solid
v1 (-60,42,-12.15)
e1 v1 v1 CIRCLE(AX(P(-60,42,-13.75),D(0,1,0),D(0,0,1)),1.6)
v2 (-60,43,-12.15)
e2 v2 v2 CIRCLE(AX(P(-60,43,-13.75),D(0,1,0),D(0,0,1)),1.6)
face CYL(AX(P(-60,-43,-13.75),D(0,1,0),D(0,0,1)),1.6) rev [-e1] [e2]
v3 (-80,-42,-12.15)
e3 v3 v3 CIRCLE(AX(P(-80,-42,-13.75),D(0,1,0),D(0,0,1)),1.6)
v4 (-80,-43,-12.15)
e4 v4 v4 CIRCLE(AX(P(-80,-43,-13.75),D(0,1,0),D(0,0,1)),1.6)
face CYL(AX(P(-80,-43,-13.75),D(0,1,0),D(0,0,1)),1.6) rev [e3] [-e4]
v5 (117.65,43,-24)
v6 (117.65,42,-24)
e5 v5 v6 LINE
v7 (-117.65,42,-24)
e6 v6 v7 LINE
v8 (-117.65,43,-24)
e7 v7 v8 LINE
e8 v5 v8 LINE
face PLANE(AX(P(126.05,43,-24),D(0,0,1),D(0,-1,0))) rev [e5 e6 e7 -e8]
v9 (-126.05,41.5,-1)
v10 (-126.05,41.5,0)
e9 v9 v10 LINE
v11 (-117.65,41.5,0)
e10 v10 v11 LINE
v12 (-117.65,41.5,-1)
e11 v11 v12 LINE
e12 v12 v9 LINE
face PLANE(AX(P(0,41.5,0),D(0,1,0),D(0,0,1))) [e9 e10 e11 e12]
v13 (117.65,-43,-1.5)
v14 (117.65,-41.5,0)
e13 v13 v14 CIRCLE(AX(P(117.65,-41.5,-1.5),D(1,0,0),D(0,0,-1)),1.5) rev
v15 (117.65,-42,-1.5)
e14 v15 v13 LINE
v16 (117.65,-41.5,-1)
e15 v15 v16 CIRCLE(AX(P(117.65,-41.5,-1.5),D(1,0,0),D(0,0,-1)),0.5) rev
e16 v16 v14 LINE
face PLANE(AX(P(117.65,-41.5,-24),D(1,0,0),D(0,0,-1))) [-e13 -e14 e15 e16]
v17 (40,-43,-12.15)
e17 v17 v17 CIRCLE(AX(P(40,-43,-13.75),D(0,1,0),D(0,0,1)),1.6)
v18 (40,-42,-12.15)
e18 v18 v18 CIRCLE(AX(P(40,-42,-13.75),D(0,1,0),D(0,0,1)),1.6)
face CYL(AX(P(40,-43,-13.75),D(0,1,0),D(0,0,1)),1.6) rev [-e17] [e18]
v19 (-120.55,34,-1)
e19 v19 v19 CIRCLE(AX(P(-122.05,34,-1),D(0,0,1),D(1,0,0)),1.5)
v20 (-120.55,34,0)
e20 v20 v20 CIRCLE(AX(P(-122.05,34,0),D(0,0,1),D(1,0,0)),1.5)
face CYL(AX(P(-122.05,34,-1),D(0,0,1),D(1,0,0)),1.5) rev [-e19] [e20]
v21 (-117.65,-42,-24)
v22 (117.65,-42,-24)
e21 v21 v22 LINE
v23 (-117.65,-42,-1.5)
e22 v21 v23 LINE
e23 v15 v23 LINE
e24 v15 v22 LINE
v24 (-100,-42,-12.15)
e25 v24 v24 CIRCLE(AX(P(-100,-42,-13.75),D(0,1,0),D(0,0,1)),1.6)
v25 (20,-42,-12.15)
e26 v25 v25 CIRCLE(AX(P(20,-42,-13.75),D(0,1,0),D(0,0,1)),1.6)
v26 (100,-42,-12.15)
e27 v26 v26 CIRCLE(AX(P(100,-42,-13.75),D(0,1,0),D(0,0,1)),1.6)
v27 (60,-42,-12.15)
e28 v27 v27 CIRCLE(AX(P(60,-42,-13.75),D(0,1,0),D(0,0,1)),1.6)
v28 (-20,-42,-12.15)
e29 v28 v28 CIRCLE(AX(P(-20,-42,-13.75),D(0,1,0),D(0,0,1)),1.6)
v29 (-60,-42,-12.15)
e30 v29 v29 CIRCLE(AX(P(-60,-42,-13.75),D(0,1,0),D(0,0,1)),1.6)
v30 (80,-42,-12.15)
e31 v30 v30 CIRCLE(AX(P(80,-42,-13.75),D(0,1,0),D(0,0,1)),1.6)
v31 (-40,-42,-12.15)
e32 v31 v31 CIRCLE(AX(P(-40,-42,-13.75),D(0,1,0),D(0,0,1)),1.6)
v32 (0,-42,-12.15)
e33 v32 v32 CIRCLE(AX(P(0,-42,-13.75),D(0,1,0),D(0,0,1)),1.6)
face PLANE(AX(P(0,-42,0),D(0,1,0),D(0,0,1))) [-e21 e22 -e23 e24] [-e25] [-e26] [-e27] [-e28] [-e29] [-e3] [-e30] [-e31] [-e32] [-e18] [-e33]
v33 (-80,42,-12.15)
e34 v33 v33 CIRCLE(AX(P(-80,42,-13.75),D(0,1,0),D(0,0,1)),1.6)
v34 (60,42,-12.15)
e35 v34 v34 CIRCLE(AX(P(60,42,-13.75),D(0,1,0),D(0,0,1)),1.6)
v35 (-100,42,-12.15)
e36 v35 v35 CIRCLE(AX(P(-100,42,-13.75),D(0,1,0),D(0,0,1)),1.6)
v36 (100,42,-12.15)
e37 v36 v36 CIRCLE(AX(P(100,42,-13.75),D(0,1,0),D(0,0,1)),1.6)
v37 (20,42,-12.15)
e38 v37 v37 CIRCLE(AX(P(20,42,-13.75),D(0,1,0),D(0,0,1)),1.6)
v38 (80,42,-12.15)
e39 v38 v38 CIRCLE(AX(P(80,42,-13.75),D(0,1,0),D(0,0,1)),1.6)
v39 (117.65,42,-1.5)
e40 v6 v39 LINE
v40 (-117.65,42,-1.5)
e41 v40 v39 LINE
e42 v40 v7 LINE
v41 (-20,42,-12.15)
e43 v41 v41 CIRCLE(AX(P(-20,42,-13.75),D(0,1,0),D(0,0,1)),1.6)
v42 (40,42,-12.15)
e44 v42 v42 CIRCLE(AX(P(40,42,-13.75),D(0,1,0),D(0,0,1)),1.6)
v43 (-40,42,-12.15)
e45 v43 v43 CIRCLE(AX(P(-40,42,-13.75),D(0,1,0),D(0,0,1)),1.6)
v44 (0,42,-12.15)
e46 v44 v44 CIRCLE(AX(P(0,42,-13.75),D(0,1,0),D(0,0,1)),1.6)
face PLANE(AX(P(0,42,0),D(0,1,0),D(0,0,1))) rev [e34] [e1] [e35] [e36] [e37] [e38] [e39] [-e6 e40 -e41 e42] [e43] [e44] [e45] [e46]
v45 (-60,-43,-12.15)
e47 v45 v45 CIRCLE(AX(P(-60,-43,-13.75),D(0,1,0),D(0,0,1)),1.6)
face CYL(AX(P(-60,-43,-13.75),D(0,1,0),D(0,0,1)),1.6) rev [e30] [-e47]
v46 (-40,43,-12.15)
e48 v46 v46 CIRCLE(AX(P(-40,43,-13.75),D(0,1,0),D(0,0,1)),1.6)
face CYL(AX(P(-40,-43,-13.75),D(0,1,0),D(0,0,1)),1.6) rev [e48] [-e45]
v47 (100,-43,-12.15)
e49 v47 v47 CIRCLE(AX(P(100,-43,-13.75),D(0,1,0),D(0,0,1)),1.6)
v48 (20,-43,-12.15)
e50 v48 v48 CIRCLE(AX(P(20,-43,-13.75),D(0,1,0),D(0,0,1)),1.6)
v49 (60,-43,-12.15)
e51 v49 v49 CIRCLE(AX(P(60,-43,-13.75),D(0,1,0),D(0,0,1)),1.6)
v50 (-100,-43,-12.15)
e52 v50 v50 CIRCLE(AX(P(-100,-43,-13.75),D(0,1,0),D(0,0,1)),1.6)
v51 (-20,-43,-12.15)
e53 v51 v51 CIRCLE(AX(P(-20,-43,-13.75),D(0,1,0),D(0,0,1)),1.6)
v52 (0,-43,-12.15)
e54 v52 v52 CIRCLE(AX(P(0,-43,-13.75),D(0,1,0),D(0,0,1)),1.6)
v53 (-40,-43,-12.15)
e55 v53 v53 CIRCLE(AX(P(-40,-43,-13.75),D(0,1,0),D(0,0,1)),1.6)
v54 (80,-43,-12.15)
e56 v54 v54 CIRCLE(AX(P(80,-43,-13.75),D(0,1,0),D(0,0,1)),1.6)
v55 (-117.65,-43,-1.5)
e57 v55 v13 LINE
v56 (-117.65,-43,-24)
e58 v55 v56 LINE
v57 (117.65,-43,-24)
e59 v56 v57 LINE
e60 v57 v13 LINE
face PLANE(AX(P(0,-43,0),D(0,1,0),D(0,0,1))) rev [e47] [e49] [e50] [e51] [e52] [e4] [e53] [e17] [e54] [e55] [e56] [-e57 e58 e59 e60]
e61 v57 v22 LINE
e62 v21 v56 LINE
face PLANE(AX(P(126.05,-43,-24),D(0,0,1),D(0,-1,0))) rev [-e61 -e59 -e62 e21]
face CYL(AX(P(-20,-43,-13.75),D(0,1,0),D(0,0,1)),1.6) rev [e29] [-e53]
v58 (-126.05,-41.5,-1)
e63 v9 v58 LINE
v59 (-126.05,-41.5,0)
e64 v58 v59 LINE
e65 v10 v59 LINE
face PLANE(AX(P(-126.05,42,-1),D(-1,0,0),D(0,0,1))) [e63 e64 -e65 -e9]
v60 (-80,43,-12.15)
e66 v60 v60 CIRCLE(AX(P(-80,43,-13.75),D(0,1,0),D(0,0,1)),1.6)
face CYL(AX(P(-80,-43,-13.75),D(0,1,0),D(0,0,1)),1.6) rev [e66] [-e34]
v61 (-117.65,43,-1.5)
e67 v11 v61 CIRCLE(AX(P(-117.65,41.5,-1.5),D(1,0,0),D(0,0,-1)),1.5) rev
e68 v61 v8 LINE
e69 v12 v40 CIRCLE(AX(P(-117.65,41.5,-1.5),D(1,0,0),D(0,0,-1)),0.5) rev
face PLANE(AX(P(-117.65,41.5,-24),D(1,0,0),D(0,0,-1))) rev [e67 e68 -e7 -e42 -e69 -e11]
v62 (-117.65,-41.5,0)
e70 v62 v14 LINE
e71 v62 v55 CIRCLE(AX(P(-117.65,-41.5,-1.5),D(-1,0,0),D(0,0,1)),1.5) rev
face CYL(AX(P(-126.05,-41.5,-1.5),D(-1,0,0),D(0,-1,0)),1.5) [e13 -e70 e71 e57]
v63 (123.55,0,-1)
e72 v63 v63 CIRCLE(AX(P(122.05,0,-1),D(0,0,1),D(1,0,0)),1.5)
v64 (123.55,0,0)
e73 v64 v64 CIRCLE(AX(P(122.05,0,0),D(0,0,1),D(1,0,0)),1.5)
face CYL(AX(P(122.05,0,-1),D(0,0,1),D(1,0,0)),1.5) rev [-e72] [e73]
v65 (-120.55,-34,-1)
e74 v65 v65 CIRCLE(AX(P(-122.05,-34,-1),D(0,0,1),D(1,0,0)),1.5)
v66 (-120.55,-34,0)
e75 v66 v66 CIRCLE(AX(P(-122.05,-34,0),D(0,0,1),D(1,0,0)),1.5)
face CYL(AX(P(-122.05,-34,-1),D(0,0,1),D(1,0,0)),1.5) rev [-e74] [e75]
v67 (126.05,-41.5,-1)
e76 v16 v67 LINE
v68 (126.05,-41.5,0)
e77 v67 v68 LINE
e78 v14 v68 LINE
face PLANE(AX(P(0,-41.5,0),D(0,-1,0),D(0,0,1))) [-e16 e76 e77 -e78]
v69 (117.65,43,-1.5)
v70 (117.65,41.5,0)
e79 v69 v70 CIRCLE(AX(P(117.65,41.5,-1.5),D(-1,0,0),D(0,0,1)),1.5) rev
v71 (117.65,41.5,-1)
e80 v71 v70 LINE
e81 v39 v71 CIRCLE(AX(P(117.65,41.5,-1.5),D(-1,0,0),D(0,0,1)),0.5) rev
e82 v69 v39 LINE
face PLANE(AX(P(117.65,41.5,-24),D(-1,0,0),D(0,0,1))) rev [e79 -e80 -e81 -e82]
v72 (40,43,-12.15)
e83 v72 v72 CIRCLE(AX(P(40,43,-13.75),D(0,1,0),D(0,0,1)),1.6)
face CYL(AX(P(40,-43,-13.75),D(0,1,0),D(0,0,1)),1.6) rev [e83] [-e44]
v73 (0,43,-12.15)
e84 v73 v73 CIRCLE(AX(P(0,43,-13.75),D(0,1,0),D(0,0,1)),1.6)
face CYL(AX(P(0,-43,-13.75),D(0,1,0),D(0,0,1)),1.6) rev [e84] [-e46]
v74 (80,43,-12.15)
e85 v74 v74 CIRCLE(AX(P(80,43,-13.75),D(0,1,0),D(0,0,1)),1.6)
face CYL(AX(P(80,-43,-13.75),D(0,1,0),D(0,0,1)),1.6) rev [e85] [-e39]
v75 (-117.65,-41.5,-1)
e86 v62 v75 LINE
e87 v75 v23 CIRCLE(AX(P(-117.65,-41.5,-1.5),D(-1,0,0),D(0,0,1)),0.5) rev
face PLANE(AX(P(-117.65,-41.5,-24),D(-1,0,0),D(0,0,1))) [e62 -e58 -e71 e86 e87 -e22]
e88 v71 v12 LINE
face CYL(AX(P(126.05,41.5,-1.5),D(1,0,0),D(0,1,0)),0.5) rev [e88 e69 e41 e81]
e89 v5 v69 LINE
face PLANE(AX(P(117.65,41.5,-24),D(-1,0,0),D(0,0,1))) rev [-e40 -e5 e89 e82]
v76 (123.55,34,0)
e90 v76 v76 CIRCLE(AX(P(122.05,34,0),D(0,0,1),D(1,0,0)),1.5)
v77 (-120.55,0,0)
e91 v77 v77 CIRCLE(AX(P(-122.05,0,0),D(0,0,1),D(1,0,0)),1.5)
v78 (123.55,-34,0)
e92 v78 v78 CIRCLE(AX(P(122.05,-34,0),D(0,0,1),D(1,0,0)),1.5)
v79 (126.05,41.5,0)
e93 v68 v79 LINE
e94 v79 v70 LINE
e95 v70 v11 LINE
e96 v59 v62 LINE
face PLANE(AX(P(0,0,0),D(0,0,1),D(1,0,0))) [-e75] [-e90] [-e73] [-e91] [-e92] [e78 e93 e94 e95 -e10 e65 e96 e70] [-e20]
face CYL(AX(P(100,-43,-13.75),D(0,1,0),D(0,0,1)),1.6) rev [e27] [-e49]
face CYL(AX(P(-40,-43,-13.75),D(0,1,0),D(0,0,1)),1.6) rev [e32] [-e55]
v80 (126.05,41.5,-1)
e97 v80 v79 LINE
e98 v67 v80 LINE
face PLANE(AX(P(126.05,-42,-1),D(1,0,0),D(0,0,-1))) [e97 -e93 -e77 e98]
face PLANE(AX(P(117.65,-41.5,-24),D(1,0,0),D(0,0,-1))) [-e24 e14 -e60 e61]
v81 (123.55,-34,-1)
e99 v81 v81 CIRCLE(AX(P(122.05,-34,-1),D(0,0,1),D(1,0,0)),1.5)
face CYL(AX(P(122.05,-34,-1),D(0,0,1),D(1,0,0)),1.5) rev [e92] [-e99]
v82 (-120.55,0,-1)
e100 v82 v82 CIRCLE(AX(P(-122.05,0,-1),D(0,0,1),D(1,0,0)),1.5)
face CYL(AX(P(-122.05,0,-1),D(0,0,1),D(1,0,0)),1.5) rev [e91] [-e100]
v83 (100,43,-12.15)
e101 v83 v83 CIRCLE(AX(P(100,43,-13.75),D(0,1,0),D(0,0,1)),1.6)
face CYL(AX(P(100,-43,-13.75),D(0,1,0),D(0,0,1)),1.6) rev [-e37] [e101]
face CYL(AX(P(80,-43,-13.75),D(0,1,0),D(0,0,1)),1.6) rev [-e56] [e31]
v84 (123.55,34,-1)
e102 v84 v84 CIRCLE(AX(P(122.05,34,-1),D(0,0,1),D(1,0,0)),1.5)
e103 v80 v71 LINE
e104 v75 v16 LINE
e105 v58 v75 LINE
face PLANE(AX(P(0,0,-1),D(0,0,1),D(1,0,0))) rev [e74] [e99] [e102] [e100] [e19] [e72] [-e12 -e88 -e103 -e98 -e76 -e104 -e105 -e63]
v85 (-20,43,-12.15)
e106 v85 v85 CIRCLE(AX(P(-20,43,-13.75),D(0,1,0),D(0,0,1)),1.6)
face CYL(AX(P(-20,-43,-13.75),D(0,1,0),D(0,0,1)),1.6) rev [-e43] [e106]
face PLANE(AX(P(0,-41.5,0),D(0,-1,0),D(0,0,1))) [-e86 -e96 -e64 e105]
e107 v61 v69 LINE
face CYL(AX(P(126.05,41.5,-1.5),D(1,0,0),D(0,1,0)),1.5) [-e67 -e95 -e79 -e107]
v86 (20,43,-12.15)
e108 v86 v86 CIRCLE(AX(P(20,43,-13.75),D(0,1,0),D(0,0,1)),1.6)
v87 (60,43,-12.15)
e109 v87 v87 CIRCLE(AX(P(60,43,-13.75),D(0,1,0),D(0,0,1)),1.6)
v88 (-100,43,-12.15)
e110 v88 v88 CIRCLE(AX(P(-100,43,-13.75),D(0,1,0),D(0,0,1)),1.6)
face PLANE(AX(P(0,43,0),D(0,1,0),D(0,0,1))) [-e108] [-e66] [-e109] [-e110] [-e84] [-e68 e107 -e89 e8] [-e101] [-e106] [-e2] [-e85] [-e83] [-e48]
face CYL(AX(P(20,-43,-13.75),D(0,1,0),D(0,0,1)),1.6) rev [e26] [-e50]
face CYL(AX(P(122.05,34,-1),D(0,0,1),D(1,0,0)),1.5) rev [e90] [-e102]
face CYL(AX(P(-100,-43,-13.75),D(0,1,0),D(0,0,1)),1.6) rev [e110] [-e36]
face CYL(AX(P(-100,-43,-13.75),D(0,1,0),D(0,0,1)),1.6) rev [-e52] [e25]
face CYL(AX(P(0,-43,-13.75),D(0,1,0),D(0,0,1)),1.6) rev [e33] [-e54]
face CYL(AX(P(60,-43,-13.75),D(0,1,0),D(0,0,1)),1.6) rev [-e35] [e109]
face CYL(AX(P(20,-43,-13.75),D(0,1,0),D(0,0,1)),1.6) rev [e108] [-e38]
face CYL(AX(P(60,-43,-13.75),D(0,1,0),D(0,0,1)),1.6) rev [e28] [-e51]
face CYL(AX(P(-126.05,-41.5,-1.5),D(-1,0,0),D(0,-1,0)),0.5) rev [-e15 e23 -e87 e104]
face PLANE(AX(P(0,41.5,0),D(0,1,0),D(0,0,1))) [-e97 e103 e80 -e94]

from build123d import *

# Parameters (mm, degrees)
MODEL_W                        = 252.1
MODEL_H                        = 84
MODEL_R                        = 1.5
BASE_FLANGE1_DEPTH             = 1
EDGE_FLANGE1_STRIP_W           = 5
EDGE_FLANGE1_STRIP_H           = 1
EDGE_FLANGE1_STRIP_CUT_DEPTH   = 252.1
EDGE_FLANGE1_STRIP_2_W         = 5
EDGE_FLANGE1_STRIP_2_H         = 1
EDGE_FLANGE1_STRIP_CUT_2_DEPTH = 252.1
EDGE_FLANGE1_DEPTH             = 252.1
EDGE_FLANGE1_BEND_DEPTH        = 252.1
SKETCH13_R                     = 1.6
CUT_EXTRUDE1_DEPTH             = 155.468775162
SKETCH14_W                     = 8.4
SKETCH14_H                     = 24
CUT_EXTRUDE2_DEPTH             = 1.5


# Sheet-metal steps are written as plain solids
with BuildPart() as part:
    # Model → Base-Flange1 (new body)
    with BuildSketch(Plane.XY):
        Rectangle(MODEL_W, MODEL_H)
        with Locations((-122.05, 34)):
            Circle(MODEL_R, mode=Mode.SUBTRACT)
        with Locations((-122.05, -34)):
            Circle(MODEL_R, mode=Mode.SUBTRACT)
        with Locations((122.05, -34)):
            Circle(MODEL_R, mode=Mode.SUBTRACT)
        with Locations((122.05, 34)):
            Circle(MODEL_R, mode=Mode.SUBTRACT)
        with Locations((122.05, 0)):
            Circle(MODEL_R, mode=Mode.SUBTRACT)
        with Locations((-122.05, 0)):
            Circle(MODEL_R, mode=Mode.SUBTRACT)
    extrude(amount=-BASE_FLANGE1_DEPTH)

    # Edge-Flange1 strip (across the edge) → Edge-Flange1 strip cut (cut)
    with BuildSketch(Plane(origin=(126.05, -42, -1), x_dir=(0, 1, 0), z_dir=(-1, 0, 0))):
        with Locations((-2, -0.5)):
            Rectangle(EDGE_FLANGE1_STRIP_W, EDGE_FLANGE1_STRIP_H)
    extrude(amount=EDGE_FLANGE1_STRIP_CUT_DEPTH, mode=Mode.SUBTRACT)

    # Edge-Flange1 strip 2 (across the edge) → Edge-Flange1 strip cut 2 (cut)
    with BuildSketch(Plane(origin=(-126.05, 42, -1), x_dir=(0, -1, 0), z_dir=(1, 0, 0))):
        with Locations((-2, -0.5)):
            Rectangle(EDGE_FLANGE1_STRIP_2_W, EDGE_FLANGE1_STRIP_2_H)
    extrude(amount=EDGE_FLANGE1_STRIP_CUT_2_DEPTH, mode=Mode.SUBTRACT)

    # Edge-Flange1 section (across the edge) → Edge-Flange1 (add)
    with BuildSketch(Plane(origin=(126.05, -42, -1), x_dir=(0, 1, 0), z_dir=(-1, 0, 0))):
        with BuildLine():
            Line((-1, 0.5), (-1, 23))
            Line((-1, 23), (0, 23))
            Line((0, 23), (0, 0.5))
            ThreePointArc((0, 0.5), (0.146446609, 0.146446609), (0.5, 0))
            Line((0.5, 0), (0.5, -1))
            ThreePointArc((0.5, -1), (-0.560660172, -0.560660172), (-1, 0.5))
        make_face()
    extrude(amount=EDGE_FLANGE1_DEPTH)

    # Edge-Flange1 section 2 (across the edge) → Edge-Flange1 bend (add)
    with BuildSketch(Plane(origin=(-126.05, 42, -1), x_dir=(0, -1, 0), z_dir=(1, 0, 0))):
        with BuildLine():
            Line((-1, 0.5), (-1, 23))
            Line((-1, 23), (0, 23))
            Line((0, 23), (0, 0.5))
            ThreePointArc((0, 0.5), (0.146446609, 0.146446609), (0.5, 0))
            Line((0.5, 0), (0.5, -1))
            ThreePointArc((0.5, -1), (-0.560660172, -0.560660172), (-1, 0.5))
        make_face()
    extrude(amount=EDGE_FLANGE1_BEND_DEPTH)

    # Sketch13 → Cut-Extrude1 (cut, through all)
    with BuildSketch(Plane(origin=(0, 43, 0), x_dir=(1, 0, 0), z_dir=(0, 1, 0))):
        with Locations(Location((-100, 13.75, 0), (0, 0, 270))):
            Circle(SKETCH13_R)
        with Locations(Location((-80, 13.75, 0), (0, 0, 270))):
            Circle(SKETCH13_R)
        with Locations(Location((-60, 13.75, 0), (0, 0, 270))):
            Circle(SKETCH13_R)
        with Locations(Location((-40, 13.75, 0), (0, 0, 270))):
            Circle(SKETCH13_R)
        with Locations(Location((-20, 13.75, 0), (0, 0, 270))):
            Circle(SKETCH13_R)
        with Locations(Location((0, 13.75, 0), (0, 0, 270))):
            Circle(SKETCH13_R)
        with Locations(Location((20, 13.75, 0), (0, 0, 270))):
            Circle(SKETCH13_R)
        with Locations(Location((40, 13.75, 0), (0, 0, 270))):
            Circle(SKETCH13_R)
        with Locations(Location((60, 13.75, 0), (0, 0, 270))):
            Circle(SKETCH13_R)
        with Locations(Location((80, 13.75, 0), (0, 0, 270))):
            Circle(SKETCH13_R)
        with Locations(Location((100, 13.75, 0), (0, 0, 270))):
            Circle(SKETCH13_R)
    extrude(amount=-CUT_EXTRUDE1_DEPTH, mode=Mode.SUBTRACT)

    # Sketch14 → Cut-Extrude2 (cut)
    with BuildSketch(Plane(origin=(0, 43, 0), x_dir=(1, 0, 0), z_dir=(0, 1, 0))):
        with Locations((-121.85, 12)):
            Rectangle(SKETCH14_W, SKETCH14_H)
        with Locations((121.85, 12)):
            Rectangle(SKETCH14_W, SKETCH14_H)
    cut_extrude2 = extrude(amount=-CUT_EXTRUDE2_DEPTH, mode=Mode.SUBTRACT)

    # Mirror1: Cut-Extrude2 across plane
    add(cut_extrude2.mirror(Plane.ZX), mode=Mode.SUBTRACT)


solid = part.part
